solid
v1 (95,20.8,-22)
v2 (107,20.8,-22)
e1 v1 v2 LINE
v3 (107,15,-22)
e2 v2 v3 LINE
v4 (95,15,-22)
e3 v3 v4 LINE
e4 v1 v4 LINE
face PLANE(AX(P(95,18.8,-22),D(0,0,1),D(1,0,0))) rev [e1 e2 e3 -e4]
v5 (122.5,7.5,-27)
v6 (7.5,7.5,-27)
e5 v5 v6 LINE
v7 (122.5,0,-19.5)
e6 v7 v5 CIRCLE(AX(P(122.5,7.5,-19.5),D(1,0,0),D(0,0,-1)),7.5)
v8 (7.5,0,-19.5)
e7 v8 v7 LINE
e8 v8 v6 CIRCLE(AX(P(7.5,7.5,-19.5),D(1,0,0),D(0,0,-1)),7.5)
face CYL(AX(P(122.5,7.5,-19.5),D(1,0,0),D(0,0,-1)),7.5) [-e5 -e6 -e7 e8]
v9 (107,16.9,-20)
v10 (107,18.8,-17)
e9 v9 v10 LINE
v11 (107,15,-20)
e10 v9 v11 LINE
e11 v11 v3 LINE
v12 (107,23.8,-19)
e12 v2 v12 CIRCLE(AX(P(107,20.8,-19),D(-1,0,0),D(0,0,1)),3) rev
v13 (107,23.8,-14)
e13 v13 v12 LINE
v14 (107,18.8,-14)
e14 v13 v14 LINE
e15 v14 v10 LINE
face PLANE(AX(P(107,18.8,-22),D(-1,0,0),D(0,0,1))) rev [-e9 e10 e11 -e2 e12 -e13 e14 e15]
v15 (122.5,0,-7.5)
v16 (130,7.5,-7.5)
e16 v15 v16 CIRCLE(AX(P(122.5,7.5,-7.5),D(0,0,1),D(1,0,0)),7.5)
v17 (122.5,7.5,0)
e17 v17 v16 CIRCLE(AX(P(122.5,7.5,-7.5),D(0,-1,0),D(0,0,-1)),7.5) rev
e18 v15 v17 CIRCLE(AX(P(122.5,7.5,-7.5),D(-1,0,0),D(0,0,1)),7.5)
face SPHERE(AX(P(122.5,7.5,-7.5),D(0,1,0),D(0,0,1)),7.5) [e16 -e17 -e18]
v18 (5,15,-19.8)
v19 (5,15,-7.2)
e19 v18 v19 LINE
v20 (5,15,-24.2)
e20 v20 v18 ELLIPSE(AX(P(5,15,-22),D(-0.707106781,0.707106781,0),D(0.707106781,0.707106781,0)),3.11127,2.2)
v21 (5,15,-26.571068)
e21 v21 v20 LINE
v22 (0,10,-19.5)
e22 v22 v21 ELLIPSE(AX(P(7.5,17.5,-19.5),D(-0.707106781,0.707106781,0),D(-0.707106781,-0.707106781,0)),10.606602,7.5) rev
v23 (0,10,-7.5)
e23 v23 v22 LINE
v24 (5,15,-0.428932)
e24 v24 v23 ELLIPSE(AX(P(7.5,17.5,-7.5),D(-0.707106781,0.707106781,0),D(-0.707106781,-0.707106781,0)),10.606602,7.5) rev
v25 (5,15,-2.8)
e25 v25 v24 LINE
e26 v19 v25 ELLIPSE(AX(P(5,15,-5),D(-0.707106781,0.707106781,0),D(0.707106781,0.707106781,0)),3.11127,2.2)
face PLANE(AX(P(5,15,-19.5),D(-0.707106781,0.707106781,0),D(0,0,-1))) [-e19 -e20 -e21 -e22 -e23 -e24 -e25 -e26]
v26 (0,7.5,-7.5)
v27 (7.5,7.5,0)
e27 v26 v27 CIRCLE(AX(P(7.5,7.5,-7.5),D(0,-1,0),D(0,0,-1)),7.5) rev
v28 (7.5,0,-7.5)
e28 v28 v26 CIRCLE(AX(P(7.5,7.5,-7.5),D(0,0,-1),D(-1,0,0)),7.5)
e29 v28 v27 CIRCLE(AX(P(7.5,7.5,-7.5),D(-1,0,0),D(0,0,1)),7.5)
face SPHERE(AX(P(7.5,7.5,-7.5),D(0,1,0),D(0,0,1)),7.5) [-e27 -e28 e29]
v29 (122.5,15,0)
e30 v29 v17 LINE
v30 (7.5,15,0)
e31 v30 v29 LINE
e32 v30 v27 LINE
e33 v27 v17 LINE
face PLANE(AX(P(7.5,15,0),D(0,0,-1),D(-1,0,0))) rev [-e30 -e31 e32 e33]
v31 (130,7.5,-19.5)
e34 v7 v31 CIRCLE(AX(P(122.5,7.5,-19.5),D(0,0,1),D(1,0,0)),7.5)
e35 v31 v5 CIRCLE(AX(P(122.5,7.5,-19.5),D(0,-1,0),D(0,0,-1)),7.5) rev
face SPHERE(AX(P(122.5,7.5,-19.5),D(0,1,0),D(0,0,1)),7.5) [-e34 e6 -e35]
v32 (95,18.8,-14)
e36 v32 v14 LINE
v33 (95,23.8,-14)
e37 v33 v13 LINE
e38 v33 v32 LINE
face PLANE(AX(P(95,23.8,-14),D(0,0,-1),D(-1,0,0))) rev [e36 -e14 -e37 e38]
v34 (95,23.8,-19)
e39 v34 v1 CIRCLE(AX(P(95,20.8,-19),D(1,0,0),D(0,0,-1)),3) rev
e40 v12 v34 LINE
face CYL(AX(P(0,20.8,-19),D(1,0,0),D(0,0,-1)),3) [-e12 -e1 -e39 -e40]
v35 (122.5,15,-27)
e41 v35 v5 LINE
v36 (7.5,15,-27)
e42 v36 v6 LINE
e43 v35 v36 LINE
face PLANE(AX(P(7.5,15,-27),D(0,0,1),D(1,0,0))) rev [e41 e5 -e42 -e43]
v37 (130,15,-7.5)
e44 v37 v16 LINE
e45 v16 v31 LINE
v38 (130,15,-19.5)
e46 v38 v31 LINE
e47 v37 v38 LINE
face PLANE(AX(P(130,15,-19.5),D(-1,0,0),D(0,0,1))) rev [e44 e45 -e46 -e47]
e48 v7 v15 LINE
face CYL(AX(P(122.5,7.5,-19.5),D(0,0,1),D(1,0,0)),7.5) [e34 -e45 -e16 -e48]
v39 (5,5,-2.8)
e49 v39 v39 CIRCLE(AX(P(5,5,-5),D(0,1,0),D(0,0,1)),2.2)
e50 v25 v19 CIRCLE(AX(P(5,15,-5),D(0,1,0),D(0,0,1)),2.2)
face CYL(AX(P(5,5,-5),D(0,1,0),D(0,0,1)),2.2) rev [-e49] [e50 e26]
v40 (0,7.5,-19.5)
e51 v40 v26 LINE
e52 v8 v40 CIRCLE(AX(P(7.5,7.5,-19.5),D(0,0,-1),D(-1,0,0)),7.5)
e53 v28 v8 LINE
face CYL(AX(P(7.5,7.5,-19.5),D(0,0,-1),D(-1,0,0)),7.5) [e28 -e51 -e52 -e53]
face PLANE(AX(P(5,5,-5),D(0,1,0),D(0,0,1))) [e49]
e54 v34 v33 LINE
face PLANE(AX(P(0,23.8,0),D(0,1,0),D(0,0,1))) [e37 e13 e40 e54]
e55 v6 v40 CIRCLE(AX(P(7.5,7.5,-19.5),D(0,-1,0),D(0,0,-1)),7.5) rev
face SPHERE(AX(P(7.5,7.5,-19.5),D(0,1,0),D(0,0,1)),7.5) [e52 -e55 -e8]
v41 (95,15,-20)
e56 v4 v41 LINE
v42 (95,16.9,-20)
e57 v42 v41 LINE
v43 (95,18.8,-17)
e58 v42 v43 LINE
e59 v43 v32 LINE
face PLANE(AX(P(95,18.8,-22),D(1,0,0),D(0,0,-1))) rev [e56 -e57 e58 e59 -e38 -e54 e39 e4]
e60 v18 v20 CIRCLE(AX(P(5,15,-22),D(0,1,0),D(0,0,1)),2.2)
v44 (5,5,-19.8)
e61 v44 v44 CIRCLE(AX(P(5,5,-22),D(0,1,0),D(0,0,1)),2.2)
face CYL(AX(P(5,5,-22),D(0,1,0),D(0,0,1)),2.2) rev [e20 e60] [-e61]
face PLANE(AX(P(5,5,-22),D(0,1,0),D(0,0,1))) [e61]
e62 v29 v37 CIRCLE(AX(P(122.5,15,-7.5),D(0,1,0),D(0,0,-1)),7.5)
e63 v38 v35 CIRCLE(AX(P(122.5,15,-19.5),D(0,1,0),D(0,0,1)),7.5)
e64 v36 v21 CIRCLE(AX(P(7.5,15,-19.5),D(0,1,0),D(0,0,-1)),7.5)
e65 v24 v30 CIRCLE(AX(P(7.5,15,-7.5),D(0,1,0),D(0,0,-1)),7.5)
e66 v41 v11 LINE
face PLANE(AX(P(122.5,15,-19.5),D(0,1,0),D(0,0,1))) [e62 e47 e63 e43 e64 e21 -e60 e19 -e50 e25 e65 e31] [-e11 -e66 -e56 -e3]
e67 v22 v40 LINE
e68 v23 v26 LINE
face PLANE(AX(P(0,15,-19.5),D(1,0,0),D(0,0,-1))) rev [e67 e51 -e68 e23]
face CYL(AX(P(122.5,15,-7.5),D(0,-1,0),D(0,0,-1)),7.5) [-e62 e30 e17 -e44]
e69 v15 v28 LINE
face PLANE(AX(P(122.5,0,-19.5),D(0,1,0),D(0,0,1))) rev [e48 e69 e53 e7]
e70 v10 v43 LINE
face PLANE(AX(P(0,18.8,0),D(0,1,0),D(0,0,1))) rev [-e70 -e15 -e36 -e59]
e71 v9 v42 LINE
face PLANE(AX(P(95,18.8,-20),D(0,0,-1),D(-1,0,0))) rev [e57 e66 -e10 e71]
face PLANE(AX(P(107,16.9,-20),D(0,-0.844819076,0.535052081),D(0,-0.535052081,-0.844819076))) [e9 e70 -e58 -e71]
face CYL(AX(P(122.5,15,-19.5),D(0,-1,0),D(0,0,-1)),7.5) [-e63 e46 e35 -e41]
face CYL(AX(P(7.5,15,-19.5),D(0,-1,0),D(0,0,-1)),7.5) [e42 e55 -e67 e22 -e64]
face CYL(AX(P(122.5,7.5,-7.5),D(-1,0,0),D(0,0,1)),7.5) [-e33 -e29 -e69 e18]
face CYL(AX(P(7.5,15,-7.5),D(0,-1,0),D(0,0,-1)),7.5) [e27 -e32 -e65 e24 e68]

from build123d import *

# Parameters (mm, degrees)
BOSS_EXTRUDE1_DEPTH = 15
FILLET1_R           = 7.5
CHAMFER1_SIZE       = 5
SKETCH2_R           = 2.2
CUT_EXTRUDE1_DEPTH  = 10
SKETCH3_W           = 12
SKETCH3_H           = 2
BOSS_EXTRUDE2_DEPTH = 3.8
SKETCH4_W           = 12
SKETCH4_H           = 8
BOSS_EXTRUDE3_DEPTH = 5
FILLET2_R           = 3
BOSS_EXTRUDE4_DEPTH = 12


with BuildPart() as part:
    # Sketch1 → Boss-Extrude1 (new body)
    with BuildSketch(Plane(origin=(0, 0, 0), x_dir=(1, 0, 0), z_dir=(0, 1, 0))):
        with BuildLine():
            Line((7.5, 27), (122.5, 27))
            ThreePointArc((122.5, 27), (127.803300859, 24.803300859), (130, 19.5))
            Line((130, 19.5), (130, 7.5))
            ThreePointArc((130, 7.5), (127.803300859, 2.196699141), (122.5, 0))
            Line((122.5, 0), (7.5, 0))
            ThreePointArc((7.5, 0), (2.196699141, 2.196699141), (0, 7.5))
            Line((0, 7.5), (0, 19.5))
            ThreePointArc((0, 19.5), (2.196699141, 24.803300859), (7.5, 27))
        make_face()
    extrude(amount=BOSS_EXTRUDE1_DEPTH)

    # Fillet1
    fillet1_edges = [part.edges().sort_by_distance(p)[0] for p in [
        (0, 0, -13.5),
        (2.196699141, 0, -24.803300859),
        (65, 0, -27),
        (127.803300859, 0, -24.803300859),
        (130, 0, -13.5),
        (127.803300859, 0, -2.196699141),
        (65, 0, 0),
        (2.196699141, 0, -2.196699141),
    ]]
    fillet(fillet1_edges, radius=FILLET1_R)

    # Chamfer1
    # the kernel refuses this chamfer: 5 mm, written as the material it takes off along each edge
    with BuildSketch(Plane(origin=(0, 15, 5.35841494), x_dir=(-0.02749587661058638, -0.9996219169112968, 0), z_dir=(0, 0, -1))) as chamfer1_piece_1:
        Polygon((CHAMFER1_SIZE * 0.999621916911, -CHAMFER1_SIZE * 0.0274958766106), (-CHAMFER1_SIZE * 0.0274958766106, -CHAMFER1_SIZE * 0.999621916911), (0, 0), align=None)
    extrude(amount=37.71682988, mode=Mode.SUBTRACT)

    # Sketch2 → Cut-Extrude1 (cut)
    with BuildSketch(Plane(origin=(0, 15, 0), x_dir=(1, 0, 0), z_dir=(0, 1, 0))):
        with Locations(Location((5, 22, 0), (0, 0, 270))):
            Circle(SKETCH2_R)
        with Locations(Location((5, 5, 0), (0, 0, 270))):
            Circle(SKETCH2_R)
    extrude(amount=-CUT_EXTRUDE1_DEPTH, mode=Mode.SUBTRACT)

    # Sketch3 → Boss-Extrude2 (add)
    with BuildSketch(Plane(origin=(0, 15, 0), x_dir=(1, 0, 0), z_dir=(0, 1, 0))):
        with Locations((101, 21)):
            Rectangle(SKETCH3_W, SKETCH3_H)
    extrude(amount=BOSS_EXTRUDE2_DEPTH)

    # Sketch4 → Boss-Extrude3 (add)
    with BuildSketch(Plane(origin=(0, 18.8, 0), x_dir=(1, 0, 0), z_dir=(0, 1, 0))):
        with Locations((101, 18)):
            Rectangle(SKETCH4_W, SKETCH4_H)
    extrude(amount=BOSS_EXTRUDE3_DEPTH)

    # Fillet2
    fillet2_edges = [part.edges().sort_by_distance(p)[0] for p in [
        (101, 23.8, -22),
    ]]
    fillet(fillet2_edges, radius=FILLET2_R)

    # Sketch5 → Boss-Extrude4 (add)
    with BuildSketch(Plane.ZY.offset(-95)):
        Polygon((-20, 18.8), (-17, 18.8), (-20, 16.9), align=None)
    extrude(amount=-BOSS_EXTRUDE4_DEPTH)


solid = part.part
